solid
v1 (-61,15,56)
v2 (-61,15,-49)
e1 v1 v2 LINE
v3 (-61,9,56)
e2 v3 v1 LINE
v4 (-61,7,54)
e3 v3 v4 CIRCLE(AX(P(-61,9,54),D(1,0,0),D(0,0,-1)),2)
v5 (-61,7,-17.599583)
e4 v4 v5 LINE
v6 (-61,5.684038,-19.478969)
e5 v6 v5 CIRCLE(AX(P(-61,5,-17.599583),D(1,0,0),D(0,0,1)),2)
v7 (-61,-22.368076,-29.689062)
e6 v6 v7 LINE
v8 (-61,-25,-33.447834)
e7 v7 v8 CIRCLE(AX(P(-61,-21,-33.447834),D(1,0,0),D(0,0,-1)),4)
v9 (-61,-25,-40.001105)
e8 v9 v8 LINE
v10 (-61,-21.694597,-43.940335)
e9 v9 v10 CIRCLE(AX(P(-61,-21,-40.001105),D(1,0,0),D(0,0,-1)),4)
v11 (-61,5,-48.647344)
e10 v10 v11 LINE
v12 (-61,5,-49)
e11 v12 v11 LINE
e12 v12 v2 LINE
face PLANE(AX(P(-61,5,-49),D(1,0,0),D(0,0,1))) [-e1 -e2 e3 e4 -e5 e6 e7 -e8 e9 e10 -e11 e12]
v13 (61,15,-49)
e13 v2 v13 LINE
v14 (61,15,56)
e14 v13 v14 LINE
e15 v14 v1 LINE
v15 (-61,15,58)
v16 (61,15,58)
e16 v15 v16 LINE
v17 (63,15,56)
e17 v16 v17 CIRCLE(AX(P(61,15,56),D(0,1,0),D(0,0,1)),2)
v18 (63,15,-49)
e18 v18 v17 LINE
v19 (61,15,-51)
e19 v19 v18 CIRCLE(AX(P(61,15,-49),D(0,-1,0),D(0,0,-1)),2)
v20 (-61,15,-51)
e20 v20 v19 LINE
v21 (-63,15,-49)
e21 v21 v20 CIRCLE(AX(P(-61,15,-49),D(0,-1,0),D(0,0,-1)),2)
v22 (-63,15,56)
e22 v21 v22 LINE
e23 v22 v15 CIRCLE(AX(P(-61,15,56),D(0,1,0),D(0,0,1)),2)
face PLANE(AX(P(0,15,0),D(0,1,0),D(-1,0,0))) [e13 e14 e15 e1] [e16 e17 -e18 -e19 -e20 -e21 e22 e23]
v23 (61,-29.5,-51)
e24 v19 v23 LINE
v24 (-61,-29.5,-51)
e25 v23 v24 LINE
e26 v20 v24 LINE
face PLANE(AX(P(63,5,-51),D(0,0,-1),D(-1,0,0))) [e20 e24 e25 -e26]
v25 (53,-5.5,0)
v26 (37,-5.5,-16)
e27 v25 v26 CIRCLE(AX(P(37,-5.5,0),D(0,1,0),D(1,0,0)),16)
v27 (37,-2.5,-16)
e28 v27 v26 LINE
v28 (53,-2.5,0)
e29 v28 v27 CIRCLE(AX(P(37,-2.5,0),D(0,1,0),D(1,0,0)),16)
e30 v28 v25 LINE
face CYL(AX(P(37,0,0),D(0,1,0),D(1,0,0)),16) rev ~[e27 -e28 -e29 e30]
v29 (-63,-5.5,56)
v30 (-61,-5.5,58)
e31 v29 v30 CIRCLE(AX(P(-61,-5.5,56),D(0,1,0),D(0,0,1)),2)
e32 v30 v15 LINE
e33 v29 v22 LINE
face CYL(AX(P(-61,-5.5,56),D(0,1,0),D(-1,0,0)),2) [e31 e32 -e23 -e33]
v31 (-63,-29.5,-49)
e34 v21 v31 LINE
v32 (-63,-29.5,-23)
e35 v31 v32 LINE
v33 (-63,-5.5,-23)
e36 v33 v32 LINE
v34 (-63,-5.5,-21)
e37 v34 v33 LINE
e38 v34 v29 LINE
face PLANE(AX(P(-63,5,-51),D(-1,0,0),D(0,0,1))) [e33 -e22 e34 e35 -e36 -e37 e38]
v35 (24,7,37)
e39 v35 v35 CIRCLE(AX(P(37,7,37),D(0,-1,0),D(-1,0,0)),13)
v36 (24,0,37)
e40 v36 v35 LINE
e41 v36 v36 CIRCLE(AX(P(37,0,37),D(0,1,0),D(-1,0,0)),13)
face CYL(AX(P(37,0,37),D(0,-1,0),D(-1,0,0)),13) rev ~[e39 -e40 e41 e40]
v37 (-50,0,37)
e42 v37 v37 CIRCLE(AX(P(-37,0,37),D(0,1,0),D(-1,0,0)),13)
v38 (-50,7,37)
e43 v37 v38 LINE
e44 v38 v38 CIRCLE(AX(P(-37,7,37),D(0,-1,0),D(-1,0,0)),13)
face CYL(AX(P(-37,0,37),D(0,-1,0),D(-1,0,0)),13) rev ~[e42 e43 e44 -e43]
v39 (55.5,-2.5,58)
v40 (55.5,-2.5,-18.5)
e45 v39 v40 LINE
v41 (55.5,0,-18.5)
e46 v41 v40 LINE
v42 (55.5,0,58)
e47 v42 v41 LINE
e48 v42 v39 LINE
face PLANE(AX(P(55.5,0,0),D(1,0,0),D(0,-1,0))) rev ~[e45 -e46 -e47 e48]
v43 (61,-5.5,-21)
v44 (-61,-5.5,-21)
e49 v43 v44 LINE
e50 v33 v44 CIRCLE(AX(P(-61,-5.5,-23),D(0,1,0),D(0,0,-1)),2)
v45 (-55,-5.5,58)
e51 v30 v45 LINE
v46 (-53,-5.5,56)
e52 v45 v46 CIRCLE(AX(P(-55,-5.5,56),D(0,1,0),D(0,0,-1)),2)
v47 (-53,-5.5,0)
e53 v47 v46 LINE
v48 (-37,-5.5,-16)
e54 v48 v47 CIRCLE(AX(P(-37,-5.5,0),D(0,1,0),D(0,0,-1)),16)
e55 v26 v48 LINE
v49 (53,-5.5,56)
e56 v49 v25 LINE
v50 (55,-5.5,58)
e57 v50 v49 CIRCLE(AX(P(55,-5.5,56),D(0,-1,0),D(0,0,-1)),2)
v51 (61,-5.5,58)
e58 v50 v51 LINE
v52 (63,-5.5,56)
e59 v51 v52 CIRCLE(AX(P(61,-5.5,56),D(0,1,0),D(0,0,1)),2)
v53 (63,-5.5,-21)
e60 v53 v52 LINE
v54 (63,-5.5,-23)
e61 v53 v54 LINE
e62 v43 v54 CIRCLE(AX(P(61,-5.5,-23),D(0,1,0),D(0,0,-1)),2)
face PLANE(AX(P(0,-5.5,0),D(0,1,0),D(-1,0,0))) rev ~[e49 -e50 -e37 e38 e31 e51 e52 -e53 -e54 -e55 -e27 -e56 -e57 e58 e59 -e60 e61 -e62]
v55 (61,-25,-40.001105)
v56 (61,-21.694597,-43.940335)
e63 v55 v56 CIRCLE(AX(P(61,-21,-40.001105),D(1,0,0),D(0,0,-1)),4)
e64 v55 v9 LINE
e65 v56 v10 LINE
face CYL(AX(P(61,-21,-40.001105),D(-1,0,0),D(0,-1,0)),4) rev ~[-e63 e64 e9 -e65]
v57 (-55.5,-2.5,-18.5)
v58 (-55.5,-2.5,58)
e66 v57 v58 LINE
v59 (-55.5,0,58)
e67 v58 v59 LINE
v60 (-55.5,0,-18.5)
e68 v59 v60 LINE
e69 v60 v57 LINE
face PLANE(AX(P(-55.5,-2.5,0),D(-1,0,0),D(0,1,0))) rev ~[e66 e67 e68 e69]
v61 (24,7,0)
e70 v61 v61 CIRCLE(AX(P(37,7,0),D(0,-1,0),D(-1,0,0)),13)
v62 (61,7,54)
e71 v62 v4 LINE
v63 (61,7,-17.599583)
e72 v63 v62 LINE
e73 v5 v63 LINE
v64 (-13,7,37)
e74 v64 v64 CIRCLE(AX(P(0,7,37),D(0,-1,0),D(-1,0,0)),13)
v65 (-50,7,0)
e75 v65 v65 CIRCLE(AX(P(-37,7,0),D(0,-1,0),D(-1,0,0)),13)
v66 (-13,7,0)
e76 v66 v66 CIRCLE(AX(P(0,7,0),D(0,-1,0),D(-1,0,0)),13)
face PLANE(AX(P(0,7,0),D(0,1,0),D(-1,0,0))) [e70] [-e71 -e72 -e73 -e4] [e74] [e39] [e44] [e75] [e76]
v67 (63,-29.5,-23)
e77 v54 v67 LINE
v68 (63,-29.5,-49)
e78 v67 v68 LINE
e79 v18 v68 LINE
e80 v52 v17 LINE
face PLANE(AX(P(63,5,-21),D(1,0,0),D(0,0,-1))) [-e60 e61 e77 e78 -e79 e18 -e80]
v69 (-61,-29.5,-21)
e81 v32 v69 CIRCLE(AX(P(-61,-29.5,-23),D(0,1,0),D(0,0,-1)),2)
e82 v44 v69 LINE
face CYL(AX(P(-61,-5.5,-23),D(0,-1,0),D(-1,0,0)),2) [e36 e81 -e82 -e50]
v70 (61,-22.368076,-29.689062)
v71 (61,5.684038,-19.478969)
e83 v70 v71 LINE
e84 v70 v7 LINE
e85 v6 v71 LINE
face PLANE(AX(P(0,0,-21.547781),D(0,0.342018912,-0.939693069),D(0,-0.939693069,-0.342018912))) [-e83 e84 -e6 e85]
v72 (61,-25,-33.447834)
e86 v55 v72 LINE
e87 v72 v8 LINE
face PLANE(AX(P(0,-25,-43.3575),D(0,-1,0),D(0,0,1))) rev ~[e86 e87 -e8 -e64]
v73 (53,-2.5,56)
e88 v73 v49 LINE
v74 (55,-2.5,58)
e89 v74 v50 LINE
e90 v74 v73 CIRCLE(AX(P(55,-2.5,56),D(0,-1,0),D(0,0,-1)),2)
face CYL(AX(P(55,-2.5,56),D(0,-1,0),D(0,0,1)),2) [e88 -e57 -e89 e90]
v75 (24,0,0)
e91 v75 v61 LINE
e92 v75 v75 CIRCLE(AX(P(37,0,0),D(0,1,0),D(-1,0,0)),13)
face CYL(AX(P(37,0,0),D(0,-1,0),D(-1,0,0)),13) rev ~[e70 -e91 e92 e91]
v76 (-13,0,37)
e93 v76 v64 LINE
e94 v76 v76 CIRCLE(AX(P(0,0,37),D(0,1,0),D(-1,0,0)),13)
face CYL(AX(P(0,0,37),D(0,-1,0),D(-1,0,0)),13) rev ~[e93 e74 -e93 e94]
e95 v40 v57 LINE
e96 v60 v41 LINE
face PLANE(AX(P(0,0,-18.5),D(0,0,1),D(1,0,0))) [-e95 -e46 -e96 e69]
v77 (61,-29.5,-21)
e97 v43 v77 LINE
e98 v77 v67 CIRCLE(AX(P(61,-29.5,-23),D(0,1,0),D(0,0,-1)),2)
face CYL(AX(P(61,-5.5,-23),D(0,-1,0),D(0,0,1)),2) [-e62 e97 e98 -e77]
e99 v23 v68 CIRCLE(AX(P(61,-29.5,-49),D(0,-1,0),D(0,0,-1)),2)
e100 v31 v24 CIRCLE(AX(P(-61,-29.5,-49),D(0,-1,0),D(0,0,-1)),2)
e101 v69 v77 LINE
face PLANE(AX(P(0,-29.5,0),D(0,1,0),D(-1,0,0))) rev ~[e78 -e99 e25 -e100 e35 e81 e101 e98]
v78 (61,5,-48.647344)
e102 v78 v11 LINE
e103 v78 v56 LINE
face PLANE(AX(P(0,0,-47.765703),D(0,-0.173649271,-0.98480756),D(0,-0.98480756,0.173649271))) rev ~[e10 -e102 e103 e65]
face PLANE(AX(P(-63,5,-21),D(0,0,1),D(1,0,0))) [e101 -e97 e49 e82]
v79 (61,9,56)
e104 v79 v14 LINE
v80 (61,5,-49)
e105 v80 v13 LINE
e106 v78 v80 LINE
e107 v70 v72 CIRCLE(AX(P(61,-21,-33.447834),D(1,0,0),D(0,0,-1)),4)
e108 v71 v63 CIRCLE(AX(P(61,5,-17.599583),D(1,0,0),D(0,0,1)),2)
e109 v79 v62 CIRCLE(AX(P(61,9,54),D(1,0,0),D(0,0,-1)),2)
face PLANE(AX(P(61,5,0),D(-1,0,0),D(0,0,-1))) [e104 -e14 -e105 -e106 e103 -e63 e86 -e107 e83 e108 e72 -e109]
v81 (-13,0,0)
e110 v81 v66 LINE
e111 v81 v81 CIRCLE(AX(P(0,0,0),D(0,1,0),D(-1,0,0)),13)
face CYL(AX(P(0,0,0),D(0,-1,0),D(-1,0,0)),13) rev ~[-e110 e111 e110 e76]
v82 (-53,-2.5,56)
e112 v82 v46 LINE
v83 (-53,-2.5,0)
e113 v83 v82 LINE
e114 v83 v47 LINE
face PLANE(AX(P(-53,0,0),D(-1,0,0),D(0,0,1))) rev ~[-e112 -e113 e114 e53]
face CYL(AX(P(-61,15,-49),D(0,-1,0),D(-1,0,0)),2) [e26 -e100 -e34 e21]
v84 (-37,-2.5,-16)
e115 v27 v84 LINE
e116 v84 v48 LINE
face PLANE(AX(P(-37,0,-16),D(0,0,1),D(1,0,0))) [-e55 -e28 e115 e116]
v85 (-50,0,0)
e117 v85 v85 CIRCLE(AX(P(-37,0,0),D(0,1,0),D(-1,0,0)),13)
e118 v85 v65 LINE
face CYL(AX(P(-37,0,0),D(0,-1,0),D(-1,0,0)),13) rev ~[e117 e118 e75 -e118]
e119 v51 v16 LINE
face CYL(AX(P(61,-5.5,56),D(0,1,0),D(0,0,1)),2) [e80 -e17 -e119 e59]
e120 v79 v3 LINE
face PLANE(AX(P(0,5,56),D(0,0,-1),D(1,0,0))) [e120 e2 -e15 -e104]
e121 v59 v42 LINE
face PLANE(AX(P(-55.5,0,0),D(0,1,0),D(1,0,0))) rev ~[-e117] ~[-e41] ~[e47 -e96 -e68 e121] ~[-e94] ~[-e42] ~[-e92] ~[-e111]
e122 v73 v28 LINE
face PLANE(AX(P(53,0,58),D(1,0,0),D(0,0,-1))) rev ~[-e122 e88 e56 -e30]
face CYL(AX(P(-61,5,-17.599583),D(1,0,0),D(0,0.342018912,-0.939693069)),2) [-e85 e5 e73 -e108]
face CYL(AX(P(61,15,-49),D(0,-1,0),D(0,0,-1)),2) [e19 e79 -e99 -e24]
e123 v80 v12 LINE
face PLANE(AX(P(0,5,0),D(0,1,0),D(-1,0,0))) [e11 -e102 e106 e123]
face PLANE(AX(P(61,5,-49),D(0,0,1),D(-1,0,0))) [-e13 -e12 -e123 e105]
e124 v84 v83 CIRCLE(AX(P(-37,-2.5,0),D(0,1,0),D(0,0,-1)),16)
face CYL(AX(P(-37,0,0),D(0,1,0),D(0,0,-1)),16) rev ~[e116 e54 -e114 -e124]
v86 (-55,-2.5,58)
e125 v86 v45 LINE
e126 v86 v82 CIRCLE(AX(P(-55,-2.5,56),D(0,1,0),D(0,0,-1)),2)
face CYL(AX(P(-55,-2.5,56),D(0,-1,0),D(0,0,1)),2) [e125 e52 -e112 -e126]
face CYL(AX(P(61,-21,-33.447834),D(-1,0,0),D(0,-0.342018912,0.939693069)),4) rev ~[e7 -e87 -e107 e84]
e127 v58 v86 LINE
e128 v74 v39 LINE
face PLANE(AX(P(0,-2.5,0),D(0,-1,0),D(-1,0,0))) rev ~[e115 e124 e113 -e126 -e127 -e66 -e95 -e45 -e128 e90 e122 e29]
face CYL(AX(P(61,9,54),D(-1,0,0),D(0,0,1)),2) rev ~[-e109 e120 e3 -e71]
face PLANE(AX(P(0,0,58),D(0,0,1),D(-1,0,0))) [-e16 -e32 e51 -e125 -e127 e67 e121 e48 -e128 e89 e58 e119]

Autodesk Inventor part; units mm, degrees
ref_plane "YZ Plane" through (0, 0, 0) normal (1, 0, 0) x (0, 1, 0)
ref_plane "XY Plane" through (0, 0, 0) normal (0, 0, 1) x (1, 0, 0)
sketch "Sketch1" plane through (0, 0, 0) normal (0, 1, 0) x (-1, 0, 0)
  line L0 (25.9, 0) -> (-25.9, 0) projected
  line L1 (0, -25.9) -> (0, 25.9) projected
  circle A0 centre (0, 0) radius 18.5 construction
  circle A1 centre (0, 0) radius 13 construction
  dimension "d0" = 37
  dimension "d1" = 26
sketch "Sketch2" plane through (0, 0, 0) normal (0, 1, 0) x (-1, 0, 0)
  line L0 (88.2, 0) -> (-88.2, 0) projected
  line L1 (0, -36.8) -> (0, 73.8) projected
  line L2 (-63, 58) -> (-63, -21)
  line L3 (-63, -21) -> (63, -21)
  line L4 (63, -21) -> (63, 58)
  line L5 (-63, 58) -> (63, 58)
  point P0 (0, 0)
  dimension "d3" = 126
  dimension "d29" = 21
  dimension "d30" = 58
extrude "Extrusion1" add sketch "Sketch2" along normal blind 7
sketch "Sketch6" plane through (0, 0, 0) normal (0, 1, 0) x (-1, 0, 0)
  line L0 (63, -21) -> (-63, -21) projected
  line L1 (63, 58) -> (63, -21) projected
  line L2 (-63, -21) -> (63, -21)
  line L3 (63, -21) -> (63, 58)
  line L4 (-63, 58) -> (-63, -21)
  line L5 (88.2, 0) -> (-88.2, 0) projected
  line L6 (0, -36.3) -> (0, 70.8) projected
  line L7 (63, 58) -> (-63, 58) projected
  line L8 (-53, 58) -> (-53, 0)
  line L9 (53, 0) -> (53, 58)
  line L10 (53, 58) -> (63, 58)
  line L11 (-63, 58) -> (-63, -21) projected
  line L12 (-63, 58) -> (-53, 58)
  arc A0 (37, -16) -> (53, 0) centre (37, 0) ccw
  arc A1 (-53, 0) -> (-37, -16) centre (-37, 0) ccw
  line L13 (37, -16) -> (-39.8141, -16)
  point P0 (0, 0)
  point P1 (-16, 0)
  dimension "d101" = 53
  dimension "d102" = 53
  dimension "d103" = 32
  dimension "d104" = 32
extrude "Extrusion5" add sketch "Sketch6" against normal blind 5.5 contours L0 L6 L13 A0 L5 L1 | L0 L4 L5 A1 L13 L6 | L5 L9 L7 L1 | L4 L7 L8 L5
sketch "Sketch4" plane through (0, 0, 0) normal (0, 0, 1) x (1, 0, 0)
  line L0 (-55.5, 0) -> (55.5, 0)
  line L1 (55.5, 0) -> (55.5, -2.5)
  line L2 (55.5, -2.5) -> (-55.5, -2.5)
  line L3 (-55.5, -2.5) -> (-55.5, 0)
  line L4 (-77.7, 0) -> (77.7, 0) projected
  line L5 (0, -3) -> (0, 0.5) projected
  point P0 (0, 0)
  dimension "d10" = 111
  dimension "d11" = 2.5
extrude "Extrusion6" cut sketch "Sketch4" against normal blind 21
sketch "Sketch5" plane through (0, 0, 0) normal (0, 1, 0) x (-1, 0, 0)
  circle A0 centre (0, 0) radius 18.5 construction
  circle A1 centre (0, 0) radius 18.5 construction
  line L0 (77.7, 0) -> (-77.7, 0) projected
  line L1 (0, -28.9) -> (0, 26.4) projected
  line L2 (-55.5, -21) -> (55.5, -21)
  line L3 (55.5, -21) -> (55.5, -18.5)
  line L4 (55.5, -18.5) -> (-55.5, -18.5)
  line L5 (-55.5, -18.5) -> (-55.5, -21)
  dimension "d25" = 111
  dimension "d26" = 21
extrude "Extrusion7" add sketch "Sketch5" against normal blind 2.5
sketch "Sketch7" plane through (0, 0, 0) normal (0, 0, 1) x (1, 0, 0)
  line L0 (-55.5, 0) -> (55.5, 0)
  line L1 (55.5, 0) -> (55.5, -2.5)
  line L2 (55.5, -2.5) -> (-55.5, -2.5)
  line L3 (-55.5, -2.5) -> (-55.5, 0)
  line L4 (53, 0) -> (-53, 0) projected
  line L5 (-77.7, 0) -> (77.7, 0) projected
  line L6 (0, -3) -> (0, 0.5) projected
  point P0 (-16, 0)
  point P1 (16, 0)
  dimension "d53" = 2.5
  dimension "d54" = 55.5
extrude "Extrusion8" cut sketch "Sketch7" along normal blind 58
sketch "Sketch8" plane through (0, 0, 0) normal (0, 1, 0) x (-1, 0, 0)
  circle A0 centre (0, 0) radius 13
  dimension "d34" = 26
extrude "Extrusion9" cut sketch "Sketch8" along normal through all
pattern_linear "Rectangular Pattern1" count 2 spacing 37 along (0, 0, 1) count 3 spacing 37 along (1, 0, 0) of "Extrusion9" second direction both ways yes
sketch "Sketch9" plane through (0, 7, 0) normal (0, 1, 0) x (1, 0, 0)
  circle A0 centre (0, 0) radius 13
  circle A1 centre (0, 0) radius 15
  dimension "d40" = 26
  dimension "d41" = 30
extrude "Extrusion10" [suppressed]
sketch "Sketch10" plane through (0, 5, 0) normal (0, 1, 0) x (1, 0, 0)
  arc A0 (16, 0) -> (-16, 0) centre (0, 0) ccw projected
  line L0 (1.5, -18) -> (-1.5, -18)
  line L1 (-29.4, 0) -> (29.4, 0) projected
  line L2 (0, 36.3) -> (0, -70.8) projected
  line L3 (1.5, -12) -> (-1.5, -12)
  line L4 (1.5, -12) -> (1.5, -18)
  line L5 (-1.5, -18) -> (-1.5, -12)
  dimension "d48" = 3
  dimension "d49" = 12
  dimension "d50" = 6
extrude "Extrusion11" [suppressed]
ref_plane "Work Plane1" through (0, 5, 0) normal (0, 1, 0) x (-1, 0, 0)
sketch "Sketch12" plane through (0, 5, 0) normal (0, 1, 0) x (-1, 0, 0)
  line L0 (63, 58) -> (63, -21) projected
  line L1 (63, -21) -> (-63, -21)
  line L2 (-63, -21) -> (-63, -51)
  line L3 (-63, -51) -> (63, -51)
  line L4 (63, -51) -> (63, -21)
  point P0 (0, 0)
  dimension "d61" = 126
  dimension "d62" = 30
extrude "Extrusion12" add sketch "Sketch12" against normal blind 34.5
sketch "Sketch13" plane through (0, 0, 0) normal (1, 0, 0) x (0, 1, 0)
  line L0 (-31.4, 0) -> (13.4, 0) projected
  line L1 (0, -62.5) -> (0, 32) projected
  line L2 (7, -19) -> (7, -49)
  line L3 (7, -49) -> (-25, -43.3575)
  line L4 (-25, -43.3575) -> (-25, -30.647)
  line L5 (7, -19) -> (-25, -30.647)
  point P0 (0, 0)
  dimension "d85" = 25
  dimension "d86" = 7
  dimension "d87" = 49
  dimension "d88" = 30
  dimension "d89" = 100
  dimension "d90" = 110
extrude "Extrusion14" cut sketch "Sketch13" along normal mid plane 122
sketch "Sketch14" plane through (0, 5, 0) normal (0, 1, 0) x (-1, 0, 0)
  line L0 (0, -72.3) -> (0, 76.8) projected
  line L1 (61, 56) -> (-61, 56)
  line L2 (-61, 56) -> (-61, -49)
  line L3 (-61, -49) -> (61, -49)
  line L4 (61, -49) -> (61, 56)
  line L5 (63, 58) -> (-63, 58)
  line L6 (-63, 58) -> (-63, -51)
  line L7 (-63, -51) -> (63, -51)
  line L8 (63, -51) -> (63, 58)
  line L9 (88.2, 0) -> (-88.2, 0) projected
  dimension "d91" = 51
  dimension "d92" = 58
  dimension "d93" = 126
  dimension "d94" = 122
  dimension "d95" = 56
  dimension "d96" = 49
extrude "Extrusion15" add sketch "Sketch14" along normal blind 10 contours L7 L6 L9 L2 L3 L0 | L0 L3 L4 L9 L8 L7 | L6 L5 L0 L1 L2 L9 | L9 L4 L1 L0 L5 L8
fillet "Fillet3" radius 2 4 edges at (63, 4.75, 58) (63, -7.25, -51) (-63, -7.25, -51) (-63, 4.75, 58)
fillet "Fillet5" radius 2 2 edges at (63, -17.5, -21) (-63, -17.5, -21)
fillet "Fillet6" radius 2 2 edges at (0, 7, 56) (0, 7, -19)
fillet "Fillet7" radius 4 2 edges at (0, -25, -30.647) (0, -25, -43.3575)
fillet "Fillet8" radius 2 2 edges at (-53, -4, 58) (53, -4, 58)
equation "\"d102\" = d101"
properties part number "NespressoSpeedfiller-6X"
